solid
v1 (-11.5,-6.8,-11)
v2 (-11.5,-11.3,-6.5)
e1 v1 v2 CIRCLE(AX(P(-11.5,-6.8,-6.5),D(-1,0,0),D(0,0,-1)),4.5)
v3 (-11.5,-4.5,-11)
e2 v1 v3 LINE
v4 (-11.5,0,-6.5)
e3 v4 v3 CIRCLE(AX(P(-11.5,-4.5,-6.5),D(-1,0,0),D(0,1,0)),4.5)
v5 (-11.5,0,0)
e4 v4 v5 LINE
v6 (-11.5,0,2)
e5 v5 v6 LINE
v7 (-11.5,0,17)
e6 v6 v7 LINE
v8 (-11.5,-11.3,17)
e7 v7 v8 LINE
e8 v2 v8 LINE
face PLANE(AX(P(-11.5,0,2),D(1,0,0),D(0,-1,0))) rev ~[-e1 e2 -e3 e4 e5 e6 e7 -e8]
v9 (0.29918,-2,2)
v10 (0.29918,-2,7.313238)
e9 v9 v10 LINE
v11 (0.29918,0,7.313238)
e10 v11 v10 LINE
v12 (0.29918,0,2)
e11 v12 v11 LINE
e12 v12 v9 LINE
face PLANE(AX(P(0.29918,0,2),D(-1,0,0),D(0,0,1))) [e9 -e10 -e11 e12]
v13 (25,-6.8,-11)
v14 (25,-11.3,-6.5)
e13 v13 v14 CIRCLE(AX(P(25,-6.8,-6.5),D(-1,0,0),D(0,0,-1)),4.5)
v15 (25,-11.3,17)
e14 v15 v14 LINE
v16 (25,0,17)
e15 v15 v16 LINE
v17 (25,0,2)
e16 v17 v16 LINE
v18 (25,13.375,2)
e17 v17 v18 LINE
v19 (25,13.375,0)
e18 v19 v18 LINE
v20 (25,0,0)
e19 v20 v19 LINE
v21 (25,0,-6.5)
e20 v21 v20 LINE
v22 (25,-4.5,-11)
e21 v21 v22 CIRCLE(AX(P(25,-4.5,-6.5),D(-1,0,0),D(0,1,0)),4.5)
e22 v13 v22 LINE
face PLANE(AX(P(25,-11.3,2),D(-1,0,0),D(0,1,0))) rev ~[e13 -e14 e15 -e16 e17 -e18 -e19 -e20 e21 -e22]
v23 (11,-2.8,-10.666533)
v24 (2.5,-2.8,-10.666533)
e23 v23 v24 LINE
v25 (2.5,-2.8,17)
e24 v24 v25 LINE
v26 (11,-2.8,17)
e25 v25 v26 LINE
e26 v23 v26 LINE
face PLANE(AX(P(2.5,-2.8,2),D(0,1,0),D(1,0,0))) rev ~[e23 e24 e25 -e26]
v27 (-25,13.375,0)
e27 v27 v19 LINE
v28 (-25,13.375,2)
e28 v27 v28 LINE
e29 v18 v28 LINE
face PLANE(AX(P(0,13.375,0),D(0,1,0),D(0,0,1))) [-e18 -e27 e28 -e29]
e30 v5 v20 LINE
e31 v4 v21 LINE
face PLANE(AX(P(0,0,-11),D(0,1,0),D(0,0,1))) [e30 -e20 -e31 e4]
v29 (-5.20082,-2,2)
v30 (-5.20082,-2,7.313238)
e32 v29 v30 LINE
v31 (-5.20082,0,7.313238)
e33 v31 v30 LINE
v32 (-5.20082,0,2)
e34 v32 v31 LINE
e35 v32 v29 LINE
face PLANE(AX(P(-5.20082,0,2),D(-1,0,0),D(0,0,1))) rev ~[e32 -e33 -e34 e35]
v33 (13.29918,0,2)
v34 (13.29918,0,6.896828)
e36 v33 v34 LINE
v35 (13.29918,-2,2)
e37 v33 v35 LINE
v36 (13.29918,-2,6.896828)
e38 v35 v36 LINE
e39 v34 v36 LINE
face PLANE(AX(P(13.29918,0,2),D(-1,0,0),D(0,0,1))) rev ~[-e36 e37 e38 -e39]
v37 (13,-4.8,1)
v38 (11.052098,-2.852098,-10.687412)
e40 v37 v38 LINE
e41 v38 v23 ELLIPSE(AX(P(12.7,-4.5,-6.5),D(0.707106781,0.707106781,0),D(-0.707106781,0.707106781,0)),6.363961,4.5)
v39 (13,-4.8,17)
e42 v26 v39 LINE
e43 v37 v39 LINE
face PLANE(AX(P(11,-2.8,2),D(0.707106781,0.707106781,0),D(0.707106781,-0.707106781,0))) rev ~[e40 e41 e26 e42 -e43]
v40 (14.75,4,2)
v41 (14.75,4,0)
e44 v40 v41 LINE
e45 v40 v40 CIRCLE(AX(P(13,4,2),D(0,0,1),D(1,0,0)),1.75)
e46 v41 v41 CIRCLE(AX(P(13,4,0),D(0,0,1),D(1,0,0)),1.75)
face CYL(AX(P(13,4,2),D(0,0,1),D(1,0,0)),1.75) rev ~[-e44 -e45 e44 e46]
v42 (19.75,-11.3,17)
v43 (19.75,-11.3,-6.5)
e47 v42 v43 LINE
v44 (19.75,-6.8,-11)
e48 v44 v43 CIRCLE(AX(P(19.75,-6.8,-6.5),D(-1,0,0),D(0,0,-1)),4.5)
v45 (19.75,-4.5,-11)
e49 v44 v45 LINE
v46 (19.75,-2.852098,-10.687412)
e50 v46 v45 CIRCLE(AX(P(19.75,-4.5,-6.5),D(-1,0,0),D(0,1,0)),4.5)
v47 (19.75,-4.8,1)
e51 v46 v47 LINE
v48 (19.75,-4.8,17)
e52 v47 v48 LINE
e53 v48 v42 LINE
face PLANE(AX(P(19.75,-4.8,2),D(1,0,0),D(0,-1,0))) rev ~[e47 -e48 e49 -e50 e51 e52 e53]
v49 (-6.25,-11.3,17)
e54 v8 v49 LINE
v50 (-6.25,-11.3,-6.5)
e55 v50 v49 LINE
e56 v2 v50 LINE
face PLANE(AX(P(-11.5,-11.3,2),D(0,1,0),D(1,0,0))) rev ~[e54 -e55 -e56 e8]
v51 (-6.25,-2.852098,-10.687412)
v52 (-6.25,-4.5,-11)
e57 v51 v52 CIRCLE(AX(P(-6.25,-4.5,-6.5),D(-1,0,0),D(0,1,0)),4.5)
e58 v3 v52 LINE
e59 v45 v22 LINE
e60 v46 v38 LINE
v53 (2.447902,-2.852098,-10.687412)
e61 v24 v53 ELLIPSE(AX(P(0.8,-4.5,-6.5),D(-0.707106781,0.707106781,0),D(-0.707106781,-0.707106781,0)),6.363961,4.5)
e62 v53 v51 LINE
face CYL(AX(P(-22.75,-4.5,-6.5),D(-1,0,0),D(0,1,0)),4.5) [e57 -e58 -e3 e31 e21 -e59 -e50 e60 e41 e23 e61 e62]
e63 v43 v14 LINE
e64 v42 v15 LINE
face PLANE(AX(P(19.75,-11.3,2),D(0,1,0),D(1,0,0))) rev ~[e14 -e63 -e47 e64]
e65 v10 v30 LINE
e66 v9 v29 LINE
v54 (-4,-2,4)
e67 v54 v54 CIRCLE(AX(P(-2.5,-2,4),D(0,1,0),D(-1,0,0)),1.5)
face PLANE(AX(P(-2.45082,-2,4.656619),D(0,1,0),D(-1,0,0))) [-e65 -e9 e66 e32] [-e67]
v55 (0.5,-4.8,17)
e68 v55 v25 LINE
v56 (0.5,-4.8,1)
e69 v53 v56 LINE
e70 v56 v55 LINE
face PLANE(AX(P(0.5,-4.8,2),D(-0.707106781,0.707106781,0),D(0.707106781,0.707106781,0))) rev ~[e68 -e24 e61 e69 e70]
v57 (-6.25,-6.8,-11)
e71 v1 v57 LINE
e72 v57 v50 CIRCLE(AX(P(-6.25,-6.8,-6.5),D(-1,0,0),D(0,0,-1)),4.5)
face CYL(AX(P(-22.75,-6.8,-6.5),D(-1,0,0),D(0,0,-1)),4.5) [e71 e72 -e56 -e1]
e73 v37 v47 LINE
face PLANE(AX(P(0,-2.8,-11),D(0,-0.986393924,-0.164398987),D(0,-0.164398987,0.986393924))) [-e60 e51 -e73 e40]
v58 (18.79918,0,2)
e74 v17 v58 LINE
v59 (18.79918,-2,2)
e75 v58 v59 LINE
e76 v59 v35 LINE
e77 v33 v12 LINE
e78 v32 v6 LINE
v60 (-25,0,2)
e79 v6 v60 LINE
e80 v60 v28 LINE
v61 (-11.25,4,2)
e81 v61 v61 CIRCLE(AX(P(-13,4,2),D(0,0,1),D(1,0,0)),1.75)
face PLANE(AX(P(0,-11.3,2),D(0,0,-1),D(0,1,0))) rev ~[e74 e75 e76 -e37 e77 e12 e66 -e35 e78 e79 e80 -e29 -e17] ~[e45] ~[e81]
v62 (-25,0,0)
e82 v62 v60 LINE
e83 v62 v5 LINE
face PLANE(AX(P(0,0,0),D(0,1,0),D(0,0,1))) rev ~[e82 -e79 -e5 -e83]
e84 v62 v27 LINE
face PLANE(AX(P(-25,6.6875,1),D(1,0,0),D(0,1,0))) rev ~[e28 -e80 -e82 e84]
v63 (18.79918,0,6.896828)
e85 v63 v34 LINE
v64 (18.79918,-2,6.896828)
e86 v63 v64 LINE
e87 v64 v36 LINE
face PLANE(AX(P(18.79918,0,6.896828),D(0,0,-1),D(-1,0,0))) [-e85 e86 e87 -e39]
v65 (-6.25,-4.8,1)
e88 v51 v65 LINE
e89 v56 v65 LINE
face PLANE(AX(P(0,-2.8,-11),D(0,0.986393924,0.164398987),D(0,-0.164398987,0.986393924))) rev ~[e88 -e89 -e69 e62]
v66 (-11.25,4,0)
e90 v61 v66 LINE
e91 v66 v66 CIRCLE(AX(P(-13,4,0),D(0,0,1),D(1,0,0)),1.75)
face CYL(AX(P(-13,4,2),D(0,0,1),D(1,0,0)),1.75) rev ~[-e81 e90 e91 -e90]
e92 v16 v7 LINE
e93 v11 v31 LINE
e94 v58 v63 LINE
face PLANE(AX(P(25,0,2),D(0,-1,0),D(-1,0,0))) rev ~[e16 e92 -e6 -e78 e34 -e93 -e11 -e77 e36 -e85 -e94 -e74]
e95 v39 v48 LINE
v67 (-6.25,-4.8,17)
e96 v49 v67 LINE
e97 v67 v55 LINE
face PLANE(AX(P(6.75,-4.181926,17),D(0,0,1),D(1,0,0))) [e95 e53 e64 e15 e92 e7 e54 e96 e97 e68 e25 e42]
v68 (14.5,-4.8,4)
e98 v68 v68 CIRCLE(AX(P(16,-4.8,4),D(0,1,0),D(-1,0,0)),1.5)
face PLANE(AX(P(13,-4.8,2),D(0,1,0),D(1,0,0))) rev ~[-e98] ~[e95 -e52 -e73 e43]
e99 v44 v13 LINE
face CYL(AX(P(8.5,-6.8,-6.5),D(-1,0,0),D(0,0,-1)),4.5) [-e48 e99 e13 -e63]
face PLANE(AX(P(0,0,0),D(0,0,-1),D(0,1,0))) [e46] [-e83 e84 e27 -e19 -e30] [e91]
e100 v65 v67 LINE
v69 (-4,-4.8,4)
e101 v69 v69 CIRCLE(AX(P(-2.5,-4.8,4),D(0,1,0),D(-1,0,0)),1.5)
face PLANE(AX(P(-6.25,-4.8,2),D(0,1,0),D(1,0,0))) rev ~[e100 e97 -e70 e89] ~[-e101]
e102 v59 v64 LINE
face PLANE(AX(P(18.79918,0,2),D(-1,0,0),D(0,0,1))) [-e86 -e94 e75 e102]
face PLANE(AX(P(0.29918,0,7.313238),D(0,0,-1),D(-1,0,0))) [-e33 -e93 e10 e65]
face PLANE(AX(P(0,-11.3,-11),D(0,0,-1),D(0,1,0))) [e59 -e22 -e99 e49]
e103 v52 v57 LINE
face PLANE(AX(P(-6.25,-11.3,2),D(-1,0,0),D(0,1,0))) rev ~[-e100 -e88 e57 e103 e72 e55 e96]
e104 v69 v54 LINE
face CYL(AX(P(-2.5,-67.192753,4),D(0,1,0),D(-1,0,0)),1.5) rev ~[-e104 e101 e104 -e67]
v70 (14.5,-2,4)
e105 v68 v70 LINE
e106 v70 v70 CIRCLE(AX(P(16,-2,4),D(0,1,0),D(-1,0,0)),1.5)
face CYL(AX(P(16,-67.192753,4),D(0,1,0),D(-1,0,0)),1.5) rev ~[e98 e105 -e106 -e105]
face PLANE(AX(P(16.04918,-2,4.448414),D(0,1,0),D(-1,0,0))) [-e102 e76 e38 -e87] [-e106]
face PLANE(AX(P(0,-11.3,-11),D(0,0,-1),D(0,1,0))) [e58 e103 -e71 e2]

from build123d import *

# Parameters (mm, degrees)
F0_W           = 13.375
F0_H           = 2
F1_DEPTH       = 25
F2_R           = 1.75
F3_DEPTH       = 2
F4_W           = 11.3
F4_H           = 13
F5_DEPTH       = 25
F5_DEPTH_BACK  = 11.5
F6_W           = 26
F6_H           = 6.5
F7_DEPTH       = 13
F9_DEPTH       = 13
F11_DEPTH      = 19.75
F11_DEPTH_BACK = 6.25
F13_T1_DEPTH   = 27.75
F13_T3_DEPTH   = 27.75
F13_T5_DEPTH   = 59
F15_DEPTH      = 15
F16_W          = 5.5
F16_H          = 4.8968277758
F16_H_2        = 5.3132384717
F17_DEPTH      = 2
F18_DEPTH      = 2
F19_D          = 3


# Not quite as in the source:
# - a fillet or chamfer that OpenCascade refuses, or shapes differently, is made with other operations: its cross-section is extruded or revolved along the edge and cut away or added


with BuildPart() as f1:
    # F0 (on Right) → F1 (new body, symmetric)
    with BuildSketch(Plane.YZ):
        with Locations((6.6875, 1)):
            Rectangle(F0_W, F0_H)
    extrude(amount=F1_DEPTH, both=True)

    # F2 (on face) → F3 (cut, through all)
    with BuildSketch(Plane.XY.offset(2)):
        with Locations((-13, 4)):
            Circle(F2_R)
        with Locations((13, 4)):
            Circle(F2_R)
    extrude(amount=-F3_DEPTH, mode=Mode.SUBTRACT)

    # F4 (on Right) → F5 (join, two sides)
    with BuildSketch(Plane.YZ) as f5_sk:
        with Locations((-5.65, -4.5)):
            Rectangle(F4_W, F4_H)
    extrude(amount=F5_DEPTH)
    extrude(f5_sk.sketch, amount=-F5_DEPTH_BACK)

    # F6 (on face) → F7 (cut, through all)
    with BuildSketch(Plane(origin=(0, 0, -11), x_dir=(1, 0, 0), z_dir=(0, 0, -1))):
        with Locations((6.75, 8.05)):
            Rectangle(F6_W, F6_H)
    extrude(amount=-F7_DEPTH, mode=Mode.SUBTRACT)

    # F8 (on face) → F9 (cut, through all)
    with BuildSketch(Plane(origin=(0, 0, -11), x_dir=(1, 0, 0), z_dir=(0, 0, -1))):
        Polygon((13, 4.8), (0.5, 4.8), (2.5, 2.8), (11, 2.8), align=None)
    extrude(amount=-F9_DEPTH, mode=Mode.SUBTRACT)

    # F10 (on Right) → F11 (cut, two sides)
    with BuildSketch(Plane.YZ) as f11_sk:
        Polygon((-4.8, -11), (-2.8, -11), (-4.8, 1), align=None)
    extrude(amount=F11_DEPTH, mode=Mode.SUBTRACT)
    extrude(f11_sk.sketch, amount=-F11_DEPTH_BACK, mode=Mode.SUBTRACT)

    # F13: fillet of radius 4.5 on 3 edges, made by hand

    # F13_s2 → F13_t1 (cut)
    with BuildSketch(Plane.YZ.offset(-22.75)):
        with BuildLine():
            ThreePointArc((-6.8, -11), (-9.9819805153, -9.6819805153), (-11.3, -6.5))
            Line((-11.3, -6.5), (-11.3, -11))
            Line((-11.3, -11), (-6.8, -11))
        make_face()
    extrude(amount=F13_T1_DEPTH, mode=Mode.SUBTRACT)

    # F13_s4 → F13_t3 (cut)
    with BuildSketch(Plane.YZ.offset(8.5)):
        with BuildLine():
            ThreePointArc((-6.8, -11), (-9.9819805153, -9.6819805153), (-11.3, -6.5))
            Line((-11.3, -6.5), (-11.3, -11))
            Line((-11.3, -11), (-6.8, -11))
        make_face()
    extrude(amount=F13_T3_DEPTH, mode=Mode.SUBTRACT)

    # F13_s6 → F13_t5 (cut)
    with BuildSketch(Plane.YZ.offset(-22.75)):
        with BuildLine():
            ThreePointArc((0, -6.5), (-1.3180194847, -9.6819805153), (-4.5, -11))
            Line((-4.5, -11), (0, -11))
            Line((0, -11), (0, -6.5))
        make_face()
    extrude(amount=F13_T5_DEPTH, mode=Mode.SUBTRACT)

    # F14 (on face) → F15 (join)
    with BuildSketch(Plane.XY.offset(2)):
        Polygon((25, 0), (-11.5, 0), (-11.5, -11.3), (-6.25, -11.3), (-6.25, -4.8), (0.5, -4.8), (2.5, -2.8), (11, -2.8), (13, -4.8), (19.75, -4.8), (19.75, -11.3), (25, -11.3), align=None)
    extrude(amount=F15_DEPTH)

    # F16 (on face) → F17 (join)
    with BuildSketch(Plane(origin=(0, 0, 0), x_dir=(-1, 0, 0), z_dir=(0, 1, 0))):
        with Locations((-16.04918, 4.4484138879)):
            Rectangle(F16_W, F16_H)
        with Locations((2.45082, 4.6566192359)):
            Rectangle(F16_W, F16_H_2)
    extrude(amount=-F17_DEPTH)

    # F16 (on face) → F18 (cut)
    with BuildSketch(Plane(origin=(0, 0, 0), x_dir=(-1, 0, 0), z_dir=(0, 1, 0))):
        with Locations((-16.04918, 4.4484138879)):
            Rectangle(F16_W, F16_H)
        with Locations((2.45082, 4.6566192359)):
            Rectangle(F16_W, F16_H_2)
    extrude(amount=-F18_DEPTH, mode=Mode.SUBTRACT)

    # F19 (through all)
    with Locations(Plane.XZ.offset(4.8)):
        with Locations((16, 4), (-2.5, 4)):
            Hole(F19_D / 2)


solid = f1.part
